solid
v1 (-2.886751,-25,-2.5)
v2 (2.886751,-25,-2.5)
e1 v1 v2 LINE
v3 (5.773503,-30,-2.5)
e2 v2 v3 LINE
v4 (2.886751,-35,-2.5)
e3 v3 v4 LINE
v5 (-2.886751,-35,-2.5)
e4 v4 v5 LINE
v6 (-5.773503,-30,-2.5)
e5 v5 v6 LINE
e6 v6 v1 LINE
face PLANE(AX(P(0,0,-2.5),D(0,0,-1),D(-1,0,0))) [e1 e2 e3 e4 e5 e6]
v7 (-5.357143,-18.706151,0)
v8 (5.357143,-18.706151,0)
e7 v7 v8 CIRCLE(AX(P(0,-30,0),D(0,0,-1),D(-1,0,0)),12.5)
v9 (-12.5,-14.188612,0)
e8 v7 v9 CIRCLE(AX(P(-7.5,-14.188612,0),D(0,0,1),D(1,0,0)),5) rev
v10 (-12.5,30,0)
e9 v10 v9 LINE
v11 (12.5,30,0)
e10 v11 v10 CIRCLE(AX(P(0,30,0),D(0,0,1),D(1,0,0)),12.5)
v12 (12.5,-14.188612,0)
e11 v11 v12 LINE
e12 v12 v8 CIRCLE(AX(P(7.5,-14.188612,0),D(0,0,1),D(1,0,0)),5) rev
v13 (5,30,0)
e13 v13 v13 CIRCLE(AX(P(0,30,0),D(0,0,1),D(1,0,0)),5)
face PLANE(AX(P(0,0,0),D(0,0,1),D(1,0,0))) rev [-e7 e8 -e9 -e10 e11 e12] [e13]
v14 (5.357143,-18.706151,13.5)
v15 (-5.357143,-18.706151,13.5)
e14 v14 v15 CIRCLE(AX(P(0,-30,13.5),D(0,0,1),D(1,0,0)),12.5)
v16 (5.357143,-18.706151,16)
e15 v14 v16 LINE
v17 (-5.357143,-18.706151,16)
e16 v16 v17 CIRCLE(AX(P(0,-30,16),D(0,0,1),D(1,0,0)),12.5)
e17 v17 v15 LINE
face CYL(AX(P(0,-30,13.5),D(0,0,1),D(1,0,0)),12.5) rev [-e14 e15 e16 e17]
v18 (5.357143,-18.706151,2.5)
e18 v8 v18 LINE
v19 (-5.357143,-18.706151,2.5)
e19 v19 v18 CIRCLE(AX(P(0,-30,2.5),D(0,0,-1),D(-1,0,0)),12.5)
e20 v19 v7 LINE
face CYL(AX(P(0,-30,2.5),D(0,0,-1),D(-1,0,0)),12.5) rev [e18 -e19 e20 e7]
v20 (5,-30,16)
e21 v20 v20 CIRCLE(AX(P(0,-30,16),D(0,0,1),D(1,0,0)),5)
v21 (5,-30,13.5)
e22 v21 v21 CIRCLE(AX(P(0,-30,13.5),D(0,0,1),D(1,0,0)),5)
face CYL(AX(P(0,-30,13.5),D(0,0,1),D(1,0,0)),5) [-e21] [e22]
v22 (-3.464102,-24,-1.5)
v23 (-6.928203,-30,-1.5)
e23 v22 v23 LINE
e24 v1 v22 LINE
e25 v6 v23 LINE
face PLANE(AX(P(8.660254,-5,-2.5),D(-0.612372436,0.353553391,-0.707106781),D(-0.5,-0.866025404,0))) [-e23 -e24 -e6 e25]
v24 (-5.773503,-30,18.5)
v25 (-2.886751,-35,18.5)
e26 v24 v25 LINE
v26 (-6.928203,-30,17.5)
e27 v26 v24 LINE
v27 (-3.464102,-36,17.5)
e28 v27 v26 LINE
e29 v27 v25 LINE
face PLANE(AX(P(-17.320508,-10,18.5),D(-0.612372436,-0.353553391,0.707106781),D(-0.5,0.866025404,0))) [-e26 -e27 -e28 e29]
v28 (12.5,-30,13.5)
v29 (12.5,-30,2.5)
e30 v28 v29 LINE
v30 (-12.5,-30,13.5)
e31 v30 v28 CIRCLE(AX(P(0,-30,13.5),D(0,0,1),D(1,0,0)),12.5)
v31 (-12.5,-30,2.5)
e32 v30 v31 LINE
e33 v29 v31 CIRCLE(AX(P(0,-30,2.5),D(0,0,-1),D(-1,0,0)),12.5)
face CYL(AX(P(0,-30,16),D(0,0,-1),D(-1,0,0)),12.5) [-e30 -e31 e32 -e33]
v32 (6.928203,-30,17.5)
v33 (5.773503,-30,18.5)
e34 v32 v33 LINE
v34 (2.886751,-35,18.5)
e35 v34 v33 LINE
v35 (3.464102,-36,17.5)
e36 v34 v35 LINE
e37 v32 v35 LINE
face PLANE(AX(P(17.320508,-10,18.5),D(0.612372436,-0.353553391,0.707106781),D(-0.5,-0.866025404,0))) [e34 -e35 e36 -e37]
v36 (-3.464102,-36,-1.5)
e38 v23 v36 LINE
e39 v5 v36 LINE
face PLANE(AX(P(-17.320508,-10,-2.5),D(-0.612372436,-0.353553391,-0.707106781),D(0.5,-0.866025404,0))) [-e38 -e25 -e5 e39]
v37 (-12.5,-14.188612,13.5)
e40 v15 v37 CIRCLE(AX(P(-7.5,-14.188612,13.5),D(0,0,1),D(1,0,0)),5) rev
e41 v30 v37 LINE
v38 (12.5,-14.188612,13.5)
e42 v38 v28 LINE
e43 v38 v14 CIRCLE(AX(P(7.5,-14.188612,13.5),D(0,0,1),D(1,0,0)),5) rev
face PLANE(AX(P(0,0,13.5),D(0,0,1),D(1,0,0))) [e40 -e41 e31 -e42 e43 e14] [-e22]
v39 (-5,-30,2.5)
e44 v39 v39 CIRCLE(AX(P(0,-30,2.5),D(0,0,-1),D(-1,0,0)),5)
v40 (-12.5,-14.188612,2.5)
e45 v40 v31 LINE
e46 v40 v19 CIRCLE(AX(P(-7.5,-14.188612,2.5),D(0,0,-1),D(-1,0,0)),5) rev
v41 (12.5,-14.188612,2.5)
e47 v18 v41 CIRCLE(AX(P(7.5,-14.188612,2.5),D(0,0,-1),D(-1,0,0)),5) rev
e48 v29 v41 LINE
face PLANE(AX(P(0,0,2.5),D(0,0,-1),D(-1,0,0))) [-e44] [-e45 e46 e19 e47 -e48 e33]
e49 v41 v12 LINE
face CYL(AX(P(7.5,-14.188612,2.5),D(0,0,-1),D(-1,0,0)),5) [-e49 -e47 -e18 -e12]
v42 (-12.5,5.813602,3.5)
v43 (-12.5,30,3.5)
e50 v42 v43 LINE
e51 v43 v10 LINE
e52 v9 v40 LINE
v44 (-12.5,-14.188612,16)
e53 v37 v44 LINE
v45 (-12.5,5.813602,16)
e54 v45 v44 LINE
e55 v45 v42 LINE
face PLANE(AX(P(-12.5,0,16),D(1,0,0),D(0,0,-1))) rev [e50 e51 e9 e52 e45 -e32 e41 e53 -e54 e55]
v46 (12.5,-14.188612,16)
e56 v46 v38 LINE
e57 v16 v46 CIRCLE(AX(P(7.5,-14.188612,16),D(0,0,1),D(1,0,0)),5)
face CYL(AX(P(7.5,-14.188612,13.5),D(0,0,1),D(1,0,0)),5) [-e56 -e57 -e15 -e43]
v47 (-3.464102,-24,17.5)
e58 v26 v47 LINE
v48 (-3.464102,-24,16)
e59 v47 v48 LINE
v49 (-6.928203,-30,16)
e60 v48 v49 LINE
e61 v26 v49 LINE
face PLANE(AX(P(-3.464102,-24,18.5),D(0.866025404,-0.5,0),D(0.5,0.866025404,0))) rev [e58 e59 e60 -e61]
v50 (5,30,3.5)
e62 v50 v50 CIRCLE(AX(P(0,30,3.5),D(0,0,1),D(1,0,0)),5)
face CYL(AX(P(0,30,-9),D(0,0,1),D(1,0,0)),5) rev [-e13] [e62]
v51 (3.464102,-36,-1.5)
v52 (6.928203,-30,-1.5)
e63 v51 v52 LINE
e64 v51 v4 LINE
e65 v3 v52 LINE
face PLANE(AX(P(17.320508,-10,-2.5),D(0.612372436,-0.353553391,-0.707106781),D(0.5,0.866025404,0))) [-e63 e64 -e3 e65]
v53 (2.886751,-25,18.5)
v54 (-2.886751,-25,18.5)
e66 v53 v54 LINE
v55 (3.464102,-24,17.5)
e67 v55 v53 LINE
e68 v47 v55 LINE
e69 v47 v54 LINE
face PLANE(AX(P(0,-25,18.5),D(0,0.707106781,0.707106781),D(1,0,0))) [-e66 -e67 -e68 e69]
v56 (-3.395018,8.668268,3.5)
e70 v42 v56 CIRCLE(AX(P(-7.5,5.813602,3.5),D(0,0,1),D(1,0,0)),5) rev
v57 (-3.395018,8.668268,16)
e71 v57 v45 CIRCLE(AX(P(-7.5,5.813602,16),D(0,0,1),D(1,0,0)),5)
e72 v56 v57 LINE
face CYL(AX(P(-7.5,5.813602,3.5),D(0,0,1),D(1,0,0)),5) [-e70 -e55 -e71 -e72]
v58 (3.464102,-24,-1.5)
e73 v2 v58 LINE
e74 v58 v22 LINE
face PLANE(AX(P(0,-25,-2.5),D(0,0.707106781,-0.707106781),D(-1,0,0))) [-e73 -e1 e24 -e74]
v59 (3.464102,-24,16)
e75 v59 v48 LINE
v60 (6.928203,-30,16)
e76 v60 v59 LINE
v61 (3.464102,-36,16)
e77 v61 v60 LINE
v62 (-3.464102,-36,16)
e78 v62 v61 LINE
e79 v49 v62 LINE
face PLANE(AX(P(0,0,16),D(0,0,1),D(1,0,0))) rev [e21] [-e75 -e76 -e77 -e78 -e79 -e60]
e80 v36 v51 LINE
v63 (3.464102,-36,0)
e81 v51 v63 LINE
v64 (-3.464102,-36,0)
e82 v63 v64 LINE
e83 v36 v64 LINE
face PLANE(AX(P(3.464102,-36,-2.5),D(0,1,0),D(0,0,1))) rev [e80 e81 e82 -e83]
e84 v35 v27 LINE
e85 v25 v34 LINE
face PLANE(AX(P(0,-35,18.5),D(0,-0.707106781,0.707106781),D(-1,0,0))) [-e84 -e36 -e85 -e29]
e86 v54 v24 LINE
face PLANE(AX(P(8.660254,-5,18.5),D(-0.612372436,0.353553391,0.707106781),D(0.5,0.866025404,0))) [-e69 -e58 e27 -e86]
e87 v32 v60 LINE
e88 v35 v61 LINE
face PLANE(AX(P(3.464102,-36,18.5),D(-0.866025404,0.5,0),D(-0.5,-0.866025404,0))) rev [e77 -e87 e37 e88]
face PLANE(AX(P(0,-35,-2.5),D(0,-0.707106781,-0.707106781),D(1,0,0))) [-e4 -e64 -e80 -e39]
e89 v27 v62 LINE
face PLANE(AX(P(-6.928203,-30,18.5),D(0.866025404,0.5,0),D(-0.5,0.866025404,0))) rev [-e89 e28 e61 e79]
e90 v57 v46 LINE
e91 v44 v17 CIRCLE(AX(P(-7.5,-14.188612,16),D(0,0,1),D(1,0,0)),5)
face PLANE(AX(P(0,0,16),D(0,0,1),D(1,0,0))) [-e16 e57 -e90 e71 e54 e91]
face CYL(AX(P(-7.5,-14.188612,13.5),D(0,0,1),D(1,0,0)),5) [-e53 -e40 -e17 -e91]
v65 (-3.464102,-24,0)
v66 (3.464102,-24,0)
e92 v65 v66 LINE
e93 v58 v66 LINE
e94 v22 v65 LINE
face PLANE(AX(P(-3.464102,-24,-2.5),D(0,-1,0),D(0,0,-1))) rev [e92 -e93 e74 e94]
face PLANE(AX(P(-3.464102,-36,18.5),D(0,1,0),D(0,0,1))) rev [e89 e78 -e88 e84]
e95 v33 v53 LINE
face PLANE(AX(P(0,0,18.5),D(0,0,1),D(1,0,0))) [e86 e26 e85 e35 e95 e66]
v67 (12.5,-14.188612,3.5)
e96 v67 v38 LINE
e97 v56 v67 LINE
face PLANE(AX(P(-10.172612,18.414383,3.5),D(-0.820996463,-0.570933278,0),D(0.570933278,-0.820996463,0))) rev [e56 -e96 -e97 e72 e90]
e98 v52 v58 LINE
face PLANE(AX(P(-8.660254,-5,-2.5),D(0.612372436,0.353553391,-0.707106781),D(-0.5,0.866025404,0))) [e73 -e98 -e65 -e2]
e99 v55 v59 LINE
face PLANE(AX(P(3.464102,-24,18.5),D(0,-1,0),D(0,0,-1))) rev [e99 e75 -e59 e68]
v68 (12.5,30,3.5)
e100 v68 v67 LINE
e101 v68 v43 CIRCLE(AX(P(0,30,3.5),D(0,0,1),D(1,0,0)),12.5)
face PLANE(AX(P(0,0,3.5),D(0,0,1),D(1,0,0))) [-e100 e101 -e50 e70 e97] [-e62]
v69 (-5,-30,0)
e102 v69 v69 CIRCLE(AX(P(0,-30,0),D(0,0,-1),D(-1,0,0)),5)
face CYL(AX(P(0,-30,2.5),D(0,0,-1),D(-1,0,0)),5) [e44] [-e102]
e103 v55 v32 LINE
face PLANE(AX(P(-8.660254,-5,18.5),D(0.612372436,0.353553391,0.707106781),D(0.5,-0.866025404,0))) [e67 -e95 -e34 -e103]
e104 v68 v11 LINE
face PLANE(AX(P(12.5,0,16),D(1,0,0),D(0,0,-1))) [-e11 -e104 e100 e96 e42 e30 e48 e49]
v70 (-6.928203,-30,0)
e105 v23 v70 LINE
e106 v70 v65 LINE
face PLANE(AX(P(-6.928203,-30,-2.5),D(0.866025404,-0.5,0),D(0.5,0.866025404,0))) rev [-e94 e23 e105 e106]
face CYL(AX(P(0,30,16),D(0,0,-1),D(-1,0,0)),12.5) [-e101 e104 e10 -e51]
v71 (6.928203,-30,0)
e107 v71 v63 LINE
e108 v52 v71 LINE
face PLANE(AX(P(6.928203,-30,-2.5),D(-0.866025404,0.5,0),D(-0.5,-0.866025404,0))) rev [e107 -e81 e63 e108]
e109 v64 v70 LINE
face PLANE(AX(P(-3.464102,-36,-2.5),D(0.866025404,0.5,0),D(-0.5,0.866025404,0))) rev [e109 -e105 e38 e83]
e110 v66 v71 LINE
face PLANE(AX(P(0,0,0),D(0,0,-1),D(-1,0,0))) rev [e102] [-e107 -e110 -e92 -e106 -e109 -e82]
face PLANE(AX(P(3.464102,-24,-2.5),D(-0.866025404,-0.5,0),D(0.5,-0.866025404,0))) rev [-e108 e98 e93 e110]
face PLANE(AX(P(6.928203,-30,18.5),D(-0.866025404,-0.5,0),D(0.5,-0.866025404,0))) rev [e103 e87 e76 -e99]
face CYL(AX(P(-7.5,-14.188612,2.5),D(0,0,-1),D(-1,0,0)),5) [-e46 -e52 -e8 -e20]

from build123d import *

# Parameters (mm, degrees)
CROQUIS1_R              = 12.5
CROQUIS1_R_2            = 7.5
CROQUIS1_R_3            = 5
SALIENTE_EXTRUIR2_DEPTH = 16
CROQUIS2_R              = 12.5
CROQUIS2_R_2            = 5
CORTAR_EXTRUIR1_DEPTH   = 2.5
REDONDEO2_R             = 5
REDONDEO3_R             = 5
CORTAR_EXTRUIR3_START   = -2.5
CROQUIS3_R              = 12.5
CROQUIS3_R_2            = 5
CORTAR_EXTRUIR3_DEPTH   = 2.5
REDONDEO6_R             = 5
REDONDEO7_R             = 5
SALIENTE_EXTRUIR3_DEPTH = 2.5
SALIENTE_EXTRUIR4_DEPTH = 2.5
CHAFL_N2_SIZE           = 1
CHAFL_N3_SIZE           = 1
CHAFL_N4_SIZE           = 1
CHAFL_N5_SIZE           = 1
CHAFL_N6_SIZE           = 1
CHAFL_N7_SIZE           = 1
CHAFL_N8_SIZE           = 1
CHAFL_N9_SIZE           = 1
CHAFL_N10_SIZE          = 1
CHAFL_N11_SIZE          = 1
CHAFL_N12_SIZE          = 1
CHAFL_N13_SIZE          = 1
CORTAR_EXTRUIR4_START   = -12.5
CORTAR_EXTRUIR4_DEPTH   = 12.5
REDONDEO8_START         = 3.5
REDONDEO8_DEPTH         = 13.5
REDONDEO9_START         = 3.5
REDONDEO9_DEPTH         = 13.5
CORTAR_EXTRUIR5_DEPTH   = 12.5
CORTAR_EXTRUIR6_START   = -12.5
CORTAR_EXTRUIR6_DEPTH   = 12.5
REDONDEO11_R            = 5


with BuildPart() as part:
    # Croquis1 → Saliente-Extruir2 (new body)
    with BuildSketch(Plane.XY):
        with BuildLine():
            ThreePointArc((12.5, 30), (0, 42.5), (-12.5, 30))
            Line((-12.5, 30), (-5, 30))
            ThreePointArc((-5, 30), (0, 35), (5, 30))
            Line((5, 30), (12.5, 30))
        make_face()
        with BuildLine():
            ThreePointArc((5, 30), (0, 35), (-5, 30))
            Line((-5, 30), (5, 30))
        make_face()
        with BuildLine():
            Line((5, 30), (-5, 30))
            ThreePointArc((-5, 30), (0, 25), (5, 30))
        make_face()
        with BuildLine():
            ThreePointArc((-12.5, 30), (-11.180339887, 24.409830056), (-7.5, 20))
            Line((-7.5, 20), (7.5, 20))
            ThreePointArc((7.5, 20), (11.180339887, 24.409830056), (12.5, 30))
            Line((12.5, 30), (5, 30))
            ThreePointArc((5, 30), (0, 25), (-5, 30))
            Line((-5, 30), (-12.5, 30))
        make_face()
        with BuildLine():
            Line((7.5, 20), (-7.5, 20))
            ThreePointArc((-7.5, 20), (0, 17.5), (7.5, 20))
        make_face()
        with BuildLine():
            ThreePointArc((-12.5, -30), (-11.180339887, -24.409830056), (-7.5, -20))
            Line((-7.5, -20), (-7.5, 20))
            ThreePointArc((-7.5, 20), (-11.180339887, 24.409830056), (-12.5, 30))
            Line((-12.5, 30), (-12.5, -30))
        make_face()
        with BuildLine():
            Line((7.5, 20), (7.5, -20))
            ThreePointArc((7.5, -20), (11.180339887, -24.409830056), (12.5, -30))
            Line((12.5, -30), (12.5, 30))
            ThreePointArc((12.5, 30), (11.180339887, 24.409830056), (7.5, 20))
        make_face()
        with BuildLine():
            Line((-7.5, 20), (-7.5, -20))
            ThreePointArc((-7.5, -20), (0, -12.5), (7.5, -20))
            Line((7.5, -20), (7.5, 20))
            ThreePointArc((7.5, 20), (0, 17.5), (-7.5, 20))
        make_face()
        with Locations((0, -30)):
            Circle(CROQUIS1_R)
        with Locations((0, -20)):
            Circle(CROQUIS1_R_2)
        with BuildLine():
            ThreePointArc((7.5, -20), (0, -17.5), (-7.5, -20))
            Line((-7.5, -20), (7.5, -20))
        make_face()
        with BuildLine():
            Line((7.5, -20), (-7.5, -20))
            ThreePointArc((-7.5, -20), (-6.460724191, -23.809073762), (-3.630921887, -26.5625))
            ThreePointArc((-3.630921887, -26.5625), (0, -25), (3.630921887, -26.5625))
            ThreePointArc((3.630921887, -26.5625), (6.460724191, -23.809073762), (7.5, -20))
        make_face()
        with BuildLine():
            ThreePointArc((-3.630921887, -26.5625), (-6.460724191, -23.809073762), (-7.5, -20))
            ThreePointArc((-7.5, -20), (-11.180339887, -24.409830056), (-12.5, -30))
            Line((-12.5, -30), (-5, -30))
            ThreePointArc((-5, -30), (-4.64513775, -28.149947222), (-3.630921887, -26.5625))
        make_face()
        with BuildLine():
            ThreePointArc((12.5, -30), (11.180339887, -24.409830056), (7.5, -20))
            ThreePointArc((7.5, -20), (6.460724191, -23.809073762), (3.630921887, -26.5625))
            ThreePointArc((3.630921887, -26.5625), (4.64513775, -28.149947222), (5, -30))
            Line((5, -30), (12.5, -30))
        make_face()
        with BuildLine():
            Line((-5, -30), (-12.5, -30))
            ThreePointArc((-12.5, -30), (0, -42.5), (12.5, -30))
            Line((12.5, -30), (5, -30))
            ThreePointArc((5, -30), (0, -35), (-5, -30))
        make_face()
        with Locations((0, -30)):
            Circle(CROQUIS1_R_3)
        with BuildLine():
            ThreePointArc((3.630921887, -26.5625), (0, -27.5), (-3.630921887, -26.5625))
            ThreePointArc((-3.630921887, -26.5625), (-4.64513775, -28.149947222), (-5, -30))
            Line((-5, -30), (5, -30))
            ThreePointArc((5, -30), (4.64513775, -28.149947222), (3.630921887, -26.5625))
        make_face()
        with BuildLine():
            Line((5, -30), (-5, -30))
            ThreePointArc((-5, -30), (0, -35), (5, -30))
        make_face()
    extrude(amount=SALIENTE_EXTRUIR2_DEPTH)

    # Croquis2 → Cortar-Extruir1 (cut)
    with BuildSketch(Plane(origin=(0, 0, 0), x_dir=(-1, 0, 0), z_dir=(0, 0, -1))):
        with Locations((0, -30)):
            Circle(CROQUIS2_R)
        with Locations((0, -30)):
            Circle(CROQUIS2_R_2, mode=Mode.SUBTRACT)
    extrude(amount=-CORTAR_EXTRUIR1_DEPTH, mode=Mode.SUBTRACT)

    # Redondeo2
    redondeo2_edges = [part.edges().sort_by_distance(p)[0] for p in [
        (12.5, -30, 1.25),
    ]]
    fillet(redondeo2_edges, radius=REDONDEO2_R)

    # Redondeo3
    redondeo3_edges = [part.edges().sort_by_distance(p)[0] for p in [
        (-12.5, -30, 1.25),
    ]]
    fillet(redondeo3_edges, radius=REDONDEO3_R)

    # Croquis3 → Cortar-Extruir3 (cut)
    with BuildSketch(Plane.XY.offset(16).offset(CORTAR_EXTRUIR3_START)):
        with Locations((0, -30)):
            Circle(CROQUIS3_R)
        with Locations(Location((0, -30, 0), (0, 0, 180))):
            Circle(CROQUIS3_R_2, mode=Mode.SUBTRACT)
    extrude(amount=CORTAR_EXTRUIR3_DEPTH, mode=Mode.SUBTRACT)

    # Redondeo6
    redondeo6_edges = [part.edges().sort_by_distance(p)[0] for p in [
        (12.5, -30, 14.75),
    ]]
    fillet(redondeo6_edges, radius=REDONDEO6_R)

    # Redondeo7
    redondeo7_edges = [part.edges().sort_by_distance(p)[0] for p in [
        (-12.5, -30, 14.75),
    ]]
    fillet(redondeo7_edges, radius=REDONDEO7_R)

    # Croquis4 → Saliente-Extruir3 (add)
    with BuildSketch(Plane.XY.offset(16)):
        Polygon((6.92820323, -30), (3.464101615, -24), (-3.464101615, -24), (-6.92820323, -30), (-3.464101615, -36), (3.464101615, -36), align=None)
    extrude(amount=SALIENTE_EXTRUIR3_DEPTH)

    # Croquis5 → Saliente-Extruir4 (add)
    with BuildSketch(Plane(origin=(0, 0, 0), x_dir=(-1, 0, 0), z_dir=(0, 0, -1))):
        Polygon((6.92820323, -30), (3.464101615, -24), (-3.464101615, -24), (-6.92820323, -30), (-3.464101615, -36), (3.464101615, -36), align=None)
    extrude(amount=SALIENTE_EXTRUIR4_DEPTH)

    # Chaflán2
    chafl_n2_edges = [part.edges().sort_by_distance(p)[0] for p in [
        (5.196152423, -33, 18.5),
    ]]
    chamfer(chafl_n2_edges, length=CHAFL_N2_SIZE)

    # Chaflán3
    chafl_n3_edges = [part.edges().sort_by_distance(p)[0] for p in [
        (4.907477288, -26.5, 18.5),
    ]]
    chamfer(chafl_n3_edges, length=CHAFL_N3_SIZE)

    # Chaflán4
    chafl_n4_edges = [part.edges().sort_by_distance(p)[0] for p in [
        (-0.577350269, -24, 18.5),
    ]]
    chamfer(chafl_n4_edges, length=CHAFL_N4_SIZE)

    # Chaflán5
    chafl_n5_edges = [part.edges().sort_by_distance(p)[0] for p in [
        (-5.484827557, -27.5, 18.5),
    ]]
    chamfer(chafl_n5_edges, length=CHAFL_N5_SIZE)

    # Chaflán6
    chafl_n6_edges = [part.edges().sort_by_distance(p)[0] for p in [
        (-4.907477288, -33.5, 18.5),
    ]]
    chamfer(chafl_n6_edges, length=CHAFL_N6_SIZE)

    # Chaflán7
    chafl_n7_edges = [part.edges().sort_by_distance(p)[0] for p in [
        (0, -36, 18.5),
    ]]
    chamfer(chafl_n7_edges, length=CHAFL_N7_SIZE)

    # Chaflán8
    chafl_n8_edges = [part.edges().sort_by_distance(p)[0] for p in [
        (5.196152423, -33, -2.5),
    ]]
    chamfer(chafl_n8_edges, length=CHAFL_N8_SIZE)

    # Chaflán9
    chafl_n9_edges = [part.edges().sort_by_distance(p)[0] for p in [
        (4.907477288, -26.5, -2.5),
    ]]
    chamfer(chafl_n9_edges, length=CHAFL_N9_SIZE)

    # Chaflán10
    chafl_n10_edges = [part.edges().sort_by_distance(p)[0] for p in [
        (-0.577350269, -24, -2.5),
    ]]
    chamfer(chafl_n10_edges, length=CHAFL_N10_SIZE)

    # Chaflán11
    chafl_n11_edges = [part.edges().sort_by_distance(p)[0] for p in [
        (-5.484827557, -27.5, -2.5),
    ]]
    chamfer(chafl_n11_edges, length=CHAFL_N11_SIZE)

    # Chaflán12
    chafl_n12_edges = [part.edges().sort_by_distance(p)[0] for p in [
        (-4.907477288, -33.5, -2.5),
    ]]
    chamfer(chafl_n12_edges, length=CHAFL_N12_SIZE)

    # Chaflán13
    chafl_n13_edges = [part.edges().sort_by_distance(p)[0] for p in [
        (0, -36, -2.5),
    ]]
    chamfer(chafl_n13_edges, length=CHAFL_N13_SIZE)

    # Croquis6 → Cortar-Extruir4 (cut)
    with BuildSketch(Plane.XY.offset(16).offset(CORTAR_EXTRUIR4_START)):
        with BuildLine():
            ThreePointArc((12.5, 30), (0, 42.5), (-12.5, 30))
            Line((-12.5, 30), (12.5, 30))
        make_face()
        with BuildLine():
            Line((12.5, 30), (-12.5, 30))
            ThreePointArc((-12.5, 30), (0, 17.5), (12.5, 30))
        make_face()
        with BuildLine():
            Line((-12.5, 30), (12.5, 30))
            ThreePointArc((12.5, 30), (0, 42.5), (-12.5, 30))
        make_face()
    extrude(amount=CORTAR_EXTRUIR4_DEPTH, mode=Mode.SUBTRACT)

    # Redondeo8: read off the stored shape, not the designer's step
    # Redondeo8 outline → Redondeo8 (cut)
    with BuildSketch(Plane.XY.offset(REDONDEO8_START)):
        with BuildLine():
            ThreePointArc((-12.5, 14.188611699), (-10.172612419, 18.414382973), (-5.357142857, 18.706151214))
            ThreePointArc((-5.357142857, 18.706151214), (-10.564428184, 23.318468952), (-12.5, 30))
            Line((-12.5, 30), (-12.5, 14.188611699))
        make_face()
    extrude(amount=REDONDEO8_DEPTH, mode=Mode.SUBTRACT)

    # Redondeo9: read off the stored shape, not the designer's step
    # Redondeo9 outline → Redondeo9 (cut)
    with BuildSketch(Plane.XY.offset(REDONDEO9_START)):
        with BuildLine():
            ThreePointArc((5.357142857, 18.706151214), (10.172612419, 18.414382973), (12.5, 14.188611699))
            Line((12.5, 14.188611699), (12.5, 30))
            ThreePointArc((12.5, 30), (10.564428184, 23.318468952), (5.357142857, 18.706151214))
        make_face()
    extrude(amount=REDONDEO9_DEPTH, mode=Mode.SUBTRACT)

    # Croquis7 → Cortar-Extruir5 (cut)
    with BuildSketch(Plane.XY.offset(3.5)):
        with BuildLine():
            ThreePointArc((5, 30), (0, 35), (-5, 30))
            Line((-5, 30), (5, 30))
        make_face()
        with BuildLine():
            Line((5, 30), (-5, 30))
            ThreePointArc((-5, 30), (0, 25), (5, 30))
        make_face()
    extrude(amount=-CORTAR_EXTRUIR5_DEPTH, mode=Mode.SUBTRACT)

    # Croquis8 → Cortar-Extruir6 (cut)
    with BuildSketch(Plane.XY.offset(16).offset(CORTAR_EXTRUIR6_START)):
        with BuildLine():
            Line((-10.172612419, 18.414382973), (12.5, -14.188611699))
            Line((12.5, -14.188611699), (12.5, 14.188611699))
            ThreePointArc((12.5, 14.188611699), (10.172612419, 18.414382973), (5.357142857, 18.706151214))
            ThreePointArc((5.357142857, 18.706151214), (0, 17.5), (-5.357142857, 18.706151214))
            ThreePointArc((-5.357142857, 18.706151214), (-7.802394345, 19.179459088), (-10.172612419, 18.414382973))
        make_face()
    extrude(amount=CORTAR_EXTRUIR6_DEPTH, mode=Mode.SUBTRACT)

    # Redondeo11
    # the kernel refuses this fillet: 5 mm, written as the material it takes off along each edge
    with BuildSketch(Plane(origin=(-10.172612419, 18.414382973, 3.5), x_dir=(-0.181629701396011, -0.9833669973976125, 0), z_dir=(0, 0, 1))) as redondeo11_piece_1:
        with BuildLine():
            CenterArc((11.905766635, 4.916834987), REDONDEO11_R, 135.280031418, 145.184668291)
            Line((8.352995208, 8.435046918), (7.997718065, 8.786868111))
            Line((7.997718065, 8.786868111), (-0.355277143, 0.351821193))
            Line((-0.355277143, 0.351821193), (-0.367005821, -0.339568442))
            ThreePointArc((-0.367005821, -0.339568442), (4.669021571, -2.012834061), (12.904729992, -0.491683499))
            Line((12.904729992, -0.491683499), (12.813915142, 0))
        make_face()
    extrude(amount=44.534787854, mode=Mode.SUBTRACT)


solid = part.part
